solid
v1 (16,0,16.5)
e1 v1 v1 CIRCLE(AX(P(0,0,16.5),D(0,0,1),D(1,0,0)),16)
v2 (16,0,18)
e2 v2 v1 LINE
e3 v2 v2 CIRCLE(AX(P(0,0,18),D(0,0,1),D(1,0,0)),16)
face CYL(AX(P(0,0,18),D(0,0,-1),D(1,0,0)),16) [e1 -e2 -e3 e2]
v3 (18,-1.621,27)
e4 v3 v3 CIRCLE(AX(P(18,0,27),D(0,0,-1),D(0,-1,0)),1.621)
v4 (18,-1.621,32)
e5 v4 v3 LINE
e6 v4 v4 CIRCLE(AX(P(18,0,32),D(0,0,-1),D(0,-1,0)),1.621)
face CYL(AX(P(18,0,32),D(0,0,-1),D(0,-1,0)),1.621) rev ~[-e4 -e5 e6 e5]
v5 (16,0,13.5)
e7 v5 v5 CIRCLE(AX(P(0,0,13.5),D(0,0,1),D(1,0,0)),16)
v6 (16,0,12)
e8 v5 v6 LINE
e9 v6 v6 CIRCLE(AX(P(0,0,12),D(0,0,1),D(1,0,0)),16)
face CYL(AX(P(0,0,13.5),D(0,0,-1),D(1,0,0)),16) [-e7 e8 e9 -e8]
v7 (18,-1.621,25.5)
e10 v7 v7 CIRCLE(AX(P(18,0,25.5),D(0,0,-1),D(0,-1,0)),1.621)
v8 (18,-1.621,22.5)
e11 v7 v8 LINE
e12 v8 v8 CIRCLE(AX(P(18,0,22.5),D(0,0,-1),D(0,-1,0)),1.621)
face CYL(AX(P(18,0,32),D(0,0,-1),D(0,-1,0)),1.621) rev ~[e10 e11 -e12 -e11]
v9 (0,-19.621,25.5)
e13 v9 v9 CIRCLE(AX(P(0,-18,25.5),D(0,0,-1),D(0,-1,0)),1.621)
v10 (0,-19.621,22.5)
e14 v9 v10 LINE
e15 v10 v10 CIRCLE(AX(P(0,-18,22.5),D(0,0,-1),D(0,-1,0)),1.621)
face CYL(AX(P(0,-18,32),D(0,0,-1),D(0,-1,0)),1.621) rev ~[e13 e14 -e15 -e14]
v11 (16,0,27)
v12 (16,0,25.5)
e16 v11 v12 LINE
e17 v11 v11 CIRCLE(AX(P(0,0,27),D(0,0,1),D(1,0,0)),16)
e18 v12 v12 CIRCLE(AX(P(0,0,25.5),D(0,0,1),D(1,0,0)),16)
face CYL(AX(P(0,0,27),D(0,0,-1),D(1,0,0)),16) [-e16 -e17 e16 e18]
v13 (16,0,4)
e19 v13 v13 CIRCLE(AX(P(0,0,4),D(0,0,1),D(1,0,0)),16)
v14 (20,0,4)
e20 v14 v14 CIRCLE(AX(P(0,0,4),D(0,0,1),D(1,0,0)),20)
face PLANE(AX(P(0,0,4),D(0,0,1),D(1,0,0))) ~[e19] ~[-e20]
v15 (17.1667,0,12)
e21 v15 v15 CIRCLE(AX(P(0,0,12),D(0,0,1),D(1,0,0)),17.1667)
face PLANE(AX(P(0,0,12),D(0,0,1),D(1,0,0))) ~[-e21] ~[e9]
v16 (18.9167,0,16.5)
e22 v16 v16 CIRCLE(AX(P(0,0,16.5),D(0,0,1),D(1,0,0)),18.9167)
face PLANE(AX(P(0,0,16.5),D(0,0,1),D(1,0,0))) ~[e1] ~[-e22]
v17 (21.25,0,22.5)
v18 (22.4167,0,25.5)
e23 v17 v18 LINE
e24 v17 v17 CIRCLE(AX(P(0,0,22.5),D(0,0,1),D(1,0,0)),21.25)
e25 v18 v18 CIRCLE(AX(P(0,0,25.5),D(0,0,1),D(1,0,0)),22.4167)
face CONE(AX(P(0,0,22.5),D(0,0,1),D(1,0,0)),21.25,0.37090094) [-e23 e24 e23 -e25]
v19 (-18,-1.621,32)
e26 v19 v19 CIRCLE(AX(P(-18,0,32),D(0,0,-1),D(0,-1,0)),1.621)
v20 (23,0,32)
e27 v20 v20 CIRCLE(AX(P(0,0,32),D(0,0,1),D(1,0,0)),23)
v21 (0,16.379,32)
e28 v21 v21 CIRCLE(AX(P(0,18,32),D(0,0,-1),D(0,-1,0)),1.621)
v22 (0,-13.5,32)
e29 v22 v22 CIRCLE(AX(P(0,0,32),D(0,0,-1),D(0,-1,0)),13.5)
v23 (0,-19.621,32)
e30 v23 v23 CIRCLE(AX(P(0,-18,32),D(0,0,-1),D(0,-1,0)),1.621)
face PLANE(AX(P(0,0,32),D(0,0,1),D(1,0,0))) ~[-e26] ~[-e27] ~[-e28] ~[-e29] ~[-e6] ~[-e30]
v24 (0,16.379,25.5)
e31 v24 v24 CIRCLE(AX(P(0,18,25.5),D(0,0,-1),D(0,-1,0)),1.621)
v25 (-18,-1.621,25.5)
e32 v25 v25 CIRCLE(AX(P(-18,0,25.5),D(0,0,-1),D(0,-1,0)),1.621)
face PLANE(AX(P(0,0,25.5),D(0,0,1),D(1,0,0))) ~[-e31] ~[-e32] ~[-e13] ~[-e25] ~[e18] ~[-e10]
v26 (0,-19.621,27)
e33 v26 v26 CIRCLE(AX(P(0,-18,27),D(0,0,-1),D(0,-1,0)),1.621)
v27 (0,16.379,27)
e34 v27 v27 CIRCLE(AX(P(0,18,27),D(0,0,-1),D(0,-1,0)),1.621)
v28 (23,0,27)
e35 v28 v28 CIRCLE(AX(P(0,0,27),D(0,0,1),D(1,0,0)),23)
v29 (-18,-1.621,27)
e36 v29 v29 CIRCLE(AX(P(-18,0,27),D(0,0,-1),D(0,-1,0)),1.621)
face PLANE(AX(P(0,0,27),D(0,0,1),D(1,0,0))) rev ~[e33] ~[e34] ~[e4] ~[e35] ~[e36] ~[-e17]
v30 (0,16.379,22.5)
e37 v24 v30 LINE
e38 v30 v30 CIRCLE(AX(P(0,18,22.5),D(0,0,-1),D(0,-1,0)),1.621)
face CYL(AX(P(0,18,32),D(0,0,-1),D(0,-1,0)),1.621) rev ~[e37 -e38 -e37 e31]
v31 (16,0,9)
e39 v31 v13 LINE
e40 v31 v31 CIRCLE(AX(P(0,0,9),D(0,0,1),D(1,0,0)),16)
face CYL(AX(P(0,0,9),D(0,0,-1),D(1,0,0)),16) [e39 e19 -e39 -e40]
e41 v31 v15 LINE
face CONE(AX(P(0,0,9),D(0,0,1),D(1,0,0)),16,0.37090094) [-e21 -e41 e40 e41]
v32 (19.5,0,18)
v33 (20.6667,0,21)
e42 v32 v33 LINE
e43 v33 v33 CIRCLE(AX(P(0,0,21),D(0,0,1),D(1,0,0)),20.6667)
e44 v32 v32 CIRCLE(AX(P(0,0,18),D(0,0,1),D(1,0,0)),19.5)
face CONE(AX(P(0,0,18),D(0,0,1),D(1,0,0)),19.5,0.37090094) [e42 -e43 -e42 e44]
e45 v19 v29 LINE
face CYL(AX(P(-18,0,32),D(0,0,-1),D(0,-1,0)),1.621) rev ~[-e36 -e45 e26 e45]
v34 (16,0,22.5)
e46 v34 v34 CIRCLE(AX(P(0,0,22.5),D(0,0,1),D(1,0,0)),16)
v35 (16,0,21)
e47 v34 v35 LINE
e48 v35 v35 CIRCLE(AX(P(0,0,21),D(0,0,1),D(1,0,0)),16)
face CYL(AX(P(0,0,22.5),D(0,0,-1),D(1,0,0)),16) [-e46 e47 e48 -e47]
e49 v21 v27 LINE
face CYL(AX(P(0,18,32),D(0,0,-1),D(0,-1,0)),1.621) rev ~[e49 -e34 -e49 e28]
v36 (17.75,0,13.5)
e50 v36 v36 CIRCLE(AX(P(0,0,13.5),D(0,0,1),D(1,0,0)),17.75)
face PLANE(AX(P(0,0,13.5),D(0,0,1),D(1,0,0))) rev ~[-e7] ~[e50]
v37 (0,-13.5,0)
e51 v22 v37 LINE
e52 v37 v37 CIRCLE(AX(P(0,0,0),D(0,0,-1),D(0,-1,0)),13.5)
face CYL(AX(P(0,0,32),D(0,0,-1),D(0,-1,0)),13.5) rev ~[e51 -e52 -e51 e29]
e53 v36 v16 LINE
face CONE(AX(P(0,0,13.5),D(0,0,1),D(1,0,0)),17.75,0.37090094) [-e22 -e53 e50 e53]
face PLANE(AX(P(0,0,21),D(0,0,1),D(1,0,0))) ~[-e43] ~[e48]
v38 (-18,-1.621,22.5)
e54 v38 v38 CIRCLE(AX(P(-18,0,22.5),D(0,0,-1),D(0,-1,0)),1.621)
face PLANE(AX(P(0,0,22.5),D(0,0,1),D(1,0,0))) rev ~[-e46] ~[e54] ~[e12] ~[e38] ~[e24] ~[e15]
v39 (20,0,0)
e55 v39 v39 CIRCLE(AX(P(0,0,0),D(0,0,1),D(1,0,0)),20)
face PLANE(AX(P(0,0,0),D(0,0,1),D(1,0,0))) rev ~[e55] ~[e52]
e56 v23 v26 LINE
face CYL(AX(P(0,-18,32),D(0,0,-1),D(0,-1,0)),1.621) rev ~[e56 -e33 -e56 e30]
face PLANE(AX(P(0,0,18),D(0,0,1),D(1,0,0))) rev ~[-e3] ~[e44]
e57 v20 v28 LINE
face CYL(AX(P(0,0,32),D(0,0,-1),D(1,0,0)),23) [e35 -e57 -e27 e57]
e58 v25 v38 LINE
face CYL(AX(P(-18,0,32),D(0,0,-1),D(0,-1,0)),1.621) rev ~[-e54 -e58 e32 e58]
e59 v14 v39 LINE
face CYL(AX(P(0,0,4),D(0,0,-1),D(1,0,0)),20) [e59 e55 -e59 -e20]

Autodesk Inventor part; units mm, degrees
ref_plane "YZ Plane" through (0, 0, 0) normal (1, 0, 0) x (0, 1, 0)
ref_plane "XZ Plane" through (0, 0, 0) normal (0, 1, 0) x (-1, 0, 0)
ref_plane "XY Plane" through (0, 0, 0) normal (0, 0, 1) x (1, 0, 0)
sketch "Skizze1" plane through (0, 0, 0) normal (0, 1, 0) x (-1, 0, 0)
  line L0 (0, 0) -> (0, 32)
  line L1 (0, 32) -> (-23, 32)
  line L2 (-23, 32) -> (-23, 27)
  line L3 (-16, 9) -> (-16, 4)
  line L4 (-16, 4) -> (-20, 4)
  line L5 (-20, 4) -> (-20, 0)
  line L6 (-20, 0) -> (0, 0)
  line L7 (-23, 27) -> (-16, 27)
  line L8 (-16, 27) -> (-16, 25.5)
  line L9 (-16, 25.5) -> (-22.4167, 25.5)
  line L10 (-21.25, 22.5) -> (-16, 22.5)
  line L11 (-16, 22.5) -> (-16, 21)
  line L12 (-16, 21) -> (-20.6667, 21)
  line L13 (-19.5, 18) -> (-16, 18)
  line L14 (-16, 18) -> (-16, 16.5)
  line L15 (-16, 16.5) -> (-18.9167, 16.5)
  line L16 (-17.75, 13.5) -> (-16, 13.5)
  line L17 (-16, 13.5) -> (-16, 12)
  line L18 (-16, 12) -> (-17.1667, 12)
  line L19 (-16, 9) -> (-17.1667, 12)
  line L20 (-17.75, 13.5) -> (-18.9167, 16.5)
  line L21 (-19.5, 18) -> (-20.6667, 21)
  line L22 (-21.25, 22.5) -> (-22.4167, 25.5)
  point P0 (-17.75, 18)
  point P1 (-17.4583, 16.5)
  point P2 (-16.5833, 12)
  point P3 (-16.875, 13.5)
  dimension "d18" = 32
  dimension "d21" = 4
  dimension "d26" = 46
  dimension "d27" = 40
  dimension "d28" = 32
  dimension "d29" = 18
  dimension "d30" = 5
  dimension "d34" = 5
  dimension "d35" = 1.5
  dimension "d36" = 1.5
  dimension "d37" = 1.5
  dimension "d38" = 1.5
  dimension "d42" = 3
  dimension "d43" = 3
  dimension "d44" = 3
revolve "Umdrehung1" add sketch "Skizze1" angle 360 about axis through (0, 0, 0) along (0, 0, 1)
sketch "Skizze2" plane through (0, 0, 32) normal (0, 0, 1) x (1, 0, 0)
  circle A0 centre (0, 0) radius 18 construction
  point P0 (0, -18)
  point P1 (0, 18)
  point P2 (-18, 0)
  point P3 (18, 0)
  dimension "d46" = 36
hole "Bohrung1" at (0, -18, 32) at (0, 18, 32) at (-18, 0, 32) at (18, 0, 32) direction (0, 0, -1) diameter 3.242 depth 9.5 thread size "M4x0.7" class "6H" standard "ISO Metric profile"
sketch "Skizze3" plane through (0, 0, 32) normal (0, 0, 1) x (1, 0, 0)
  circle A0 centre (0, 0) radius 23 projected
hole "Bohrung2" at (0, 0, 32) direction (0, 0, -1) diameter 27 depth 32
equation "\"d36\" = d35"
equation "\"d37\" = d35"
equation "\"d38\" = d37"
properties part number "gehaeuse" material "Blei"
